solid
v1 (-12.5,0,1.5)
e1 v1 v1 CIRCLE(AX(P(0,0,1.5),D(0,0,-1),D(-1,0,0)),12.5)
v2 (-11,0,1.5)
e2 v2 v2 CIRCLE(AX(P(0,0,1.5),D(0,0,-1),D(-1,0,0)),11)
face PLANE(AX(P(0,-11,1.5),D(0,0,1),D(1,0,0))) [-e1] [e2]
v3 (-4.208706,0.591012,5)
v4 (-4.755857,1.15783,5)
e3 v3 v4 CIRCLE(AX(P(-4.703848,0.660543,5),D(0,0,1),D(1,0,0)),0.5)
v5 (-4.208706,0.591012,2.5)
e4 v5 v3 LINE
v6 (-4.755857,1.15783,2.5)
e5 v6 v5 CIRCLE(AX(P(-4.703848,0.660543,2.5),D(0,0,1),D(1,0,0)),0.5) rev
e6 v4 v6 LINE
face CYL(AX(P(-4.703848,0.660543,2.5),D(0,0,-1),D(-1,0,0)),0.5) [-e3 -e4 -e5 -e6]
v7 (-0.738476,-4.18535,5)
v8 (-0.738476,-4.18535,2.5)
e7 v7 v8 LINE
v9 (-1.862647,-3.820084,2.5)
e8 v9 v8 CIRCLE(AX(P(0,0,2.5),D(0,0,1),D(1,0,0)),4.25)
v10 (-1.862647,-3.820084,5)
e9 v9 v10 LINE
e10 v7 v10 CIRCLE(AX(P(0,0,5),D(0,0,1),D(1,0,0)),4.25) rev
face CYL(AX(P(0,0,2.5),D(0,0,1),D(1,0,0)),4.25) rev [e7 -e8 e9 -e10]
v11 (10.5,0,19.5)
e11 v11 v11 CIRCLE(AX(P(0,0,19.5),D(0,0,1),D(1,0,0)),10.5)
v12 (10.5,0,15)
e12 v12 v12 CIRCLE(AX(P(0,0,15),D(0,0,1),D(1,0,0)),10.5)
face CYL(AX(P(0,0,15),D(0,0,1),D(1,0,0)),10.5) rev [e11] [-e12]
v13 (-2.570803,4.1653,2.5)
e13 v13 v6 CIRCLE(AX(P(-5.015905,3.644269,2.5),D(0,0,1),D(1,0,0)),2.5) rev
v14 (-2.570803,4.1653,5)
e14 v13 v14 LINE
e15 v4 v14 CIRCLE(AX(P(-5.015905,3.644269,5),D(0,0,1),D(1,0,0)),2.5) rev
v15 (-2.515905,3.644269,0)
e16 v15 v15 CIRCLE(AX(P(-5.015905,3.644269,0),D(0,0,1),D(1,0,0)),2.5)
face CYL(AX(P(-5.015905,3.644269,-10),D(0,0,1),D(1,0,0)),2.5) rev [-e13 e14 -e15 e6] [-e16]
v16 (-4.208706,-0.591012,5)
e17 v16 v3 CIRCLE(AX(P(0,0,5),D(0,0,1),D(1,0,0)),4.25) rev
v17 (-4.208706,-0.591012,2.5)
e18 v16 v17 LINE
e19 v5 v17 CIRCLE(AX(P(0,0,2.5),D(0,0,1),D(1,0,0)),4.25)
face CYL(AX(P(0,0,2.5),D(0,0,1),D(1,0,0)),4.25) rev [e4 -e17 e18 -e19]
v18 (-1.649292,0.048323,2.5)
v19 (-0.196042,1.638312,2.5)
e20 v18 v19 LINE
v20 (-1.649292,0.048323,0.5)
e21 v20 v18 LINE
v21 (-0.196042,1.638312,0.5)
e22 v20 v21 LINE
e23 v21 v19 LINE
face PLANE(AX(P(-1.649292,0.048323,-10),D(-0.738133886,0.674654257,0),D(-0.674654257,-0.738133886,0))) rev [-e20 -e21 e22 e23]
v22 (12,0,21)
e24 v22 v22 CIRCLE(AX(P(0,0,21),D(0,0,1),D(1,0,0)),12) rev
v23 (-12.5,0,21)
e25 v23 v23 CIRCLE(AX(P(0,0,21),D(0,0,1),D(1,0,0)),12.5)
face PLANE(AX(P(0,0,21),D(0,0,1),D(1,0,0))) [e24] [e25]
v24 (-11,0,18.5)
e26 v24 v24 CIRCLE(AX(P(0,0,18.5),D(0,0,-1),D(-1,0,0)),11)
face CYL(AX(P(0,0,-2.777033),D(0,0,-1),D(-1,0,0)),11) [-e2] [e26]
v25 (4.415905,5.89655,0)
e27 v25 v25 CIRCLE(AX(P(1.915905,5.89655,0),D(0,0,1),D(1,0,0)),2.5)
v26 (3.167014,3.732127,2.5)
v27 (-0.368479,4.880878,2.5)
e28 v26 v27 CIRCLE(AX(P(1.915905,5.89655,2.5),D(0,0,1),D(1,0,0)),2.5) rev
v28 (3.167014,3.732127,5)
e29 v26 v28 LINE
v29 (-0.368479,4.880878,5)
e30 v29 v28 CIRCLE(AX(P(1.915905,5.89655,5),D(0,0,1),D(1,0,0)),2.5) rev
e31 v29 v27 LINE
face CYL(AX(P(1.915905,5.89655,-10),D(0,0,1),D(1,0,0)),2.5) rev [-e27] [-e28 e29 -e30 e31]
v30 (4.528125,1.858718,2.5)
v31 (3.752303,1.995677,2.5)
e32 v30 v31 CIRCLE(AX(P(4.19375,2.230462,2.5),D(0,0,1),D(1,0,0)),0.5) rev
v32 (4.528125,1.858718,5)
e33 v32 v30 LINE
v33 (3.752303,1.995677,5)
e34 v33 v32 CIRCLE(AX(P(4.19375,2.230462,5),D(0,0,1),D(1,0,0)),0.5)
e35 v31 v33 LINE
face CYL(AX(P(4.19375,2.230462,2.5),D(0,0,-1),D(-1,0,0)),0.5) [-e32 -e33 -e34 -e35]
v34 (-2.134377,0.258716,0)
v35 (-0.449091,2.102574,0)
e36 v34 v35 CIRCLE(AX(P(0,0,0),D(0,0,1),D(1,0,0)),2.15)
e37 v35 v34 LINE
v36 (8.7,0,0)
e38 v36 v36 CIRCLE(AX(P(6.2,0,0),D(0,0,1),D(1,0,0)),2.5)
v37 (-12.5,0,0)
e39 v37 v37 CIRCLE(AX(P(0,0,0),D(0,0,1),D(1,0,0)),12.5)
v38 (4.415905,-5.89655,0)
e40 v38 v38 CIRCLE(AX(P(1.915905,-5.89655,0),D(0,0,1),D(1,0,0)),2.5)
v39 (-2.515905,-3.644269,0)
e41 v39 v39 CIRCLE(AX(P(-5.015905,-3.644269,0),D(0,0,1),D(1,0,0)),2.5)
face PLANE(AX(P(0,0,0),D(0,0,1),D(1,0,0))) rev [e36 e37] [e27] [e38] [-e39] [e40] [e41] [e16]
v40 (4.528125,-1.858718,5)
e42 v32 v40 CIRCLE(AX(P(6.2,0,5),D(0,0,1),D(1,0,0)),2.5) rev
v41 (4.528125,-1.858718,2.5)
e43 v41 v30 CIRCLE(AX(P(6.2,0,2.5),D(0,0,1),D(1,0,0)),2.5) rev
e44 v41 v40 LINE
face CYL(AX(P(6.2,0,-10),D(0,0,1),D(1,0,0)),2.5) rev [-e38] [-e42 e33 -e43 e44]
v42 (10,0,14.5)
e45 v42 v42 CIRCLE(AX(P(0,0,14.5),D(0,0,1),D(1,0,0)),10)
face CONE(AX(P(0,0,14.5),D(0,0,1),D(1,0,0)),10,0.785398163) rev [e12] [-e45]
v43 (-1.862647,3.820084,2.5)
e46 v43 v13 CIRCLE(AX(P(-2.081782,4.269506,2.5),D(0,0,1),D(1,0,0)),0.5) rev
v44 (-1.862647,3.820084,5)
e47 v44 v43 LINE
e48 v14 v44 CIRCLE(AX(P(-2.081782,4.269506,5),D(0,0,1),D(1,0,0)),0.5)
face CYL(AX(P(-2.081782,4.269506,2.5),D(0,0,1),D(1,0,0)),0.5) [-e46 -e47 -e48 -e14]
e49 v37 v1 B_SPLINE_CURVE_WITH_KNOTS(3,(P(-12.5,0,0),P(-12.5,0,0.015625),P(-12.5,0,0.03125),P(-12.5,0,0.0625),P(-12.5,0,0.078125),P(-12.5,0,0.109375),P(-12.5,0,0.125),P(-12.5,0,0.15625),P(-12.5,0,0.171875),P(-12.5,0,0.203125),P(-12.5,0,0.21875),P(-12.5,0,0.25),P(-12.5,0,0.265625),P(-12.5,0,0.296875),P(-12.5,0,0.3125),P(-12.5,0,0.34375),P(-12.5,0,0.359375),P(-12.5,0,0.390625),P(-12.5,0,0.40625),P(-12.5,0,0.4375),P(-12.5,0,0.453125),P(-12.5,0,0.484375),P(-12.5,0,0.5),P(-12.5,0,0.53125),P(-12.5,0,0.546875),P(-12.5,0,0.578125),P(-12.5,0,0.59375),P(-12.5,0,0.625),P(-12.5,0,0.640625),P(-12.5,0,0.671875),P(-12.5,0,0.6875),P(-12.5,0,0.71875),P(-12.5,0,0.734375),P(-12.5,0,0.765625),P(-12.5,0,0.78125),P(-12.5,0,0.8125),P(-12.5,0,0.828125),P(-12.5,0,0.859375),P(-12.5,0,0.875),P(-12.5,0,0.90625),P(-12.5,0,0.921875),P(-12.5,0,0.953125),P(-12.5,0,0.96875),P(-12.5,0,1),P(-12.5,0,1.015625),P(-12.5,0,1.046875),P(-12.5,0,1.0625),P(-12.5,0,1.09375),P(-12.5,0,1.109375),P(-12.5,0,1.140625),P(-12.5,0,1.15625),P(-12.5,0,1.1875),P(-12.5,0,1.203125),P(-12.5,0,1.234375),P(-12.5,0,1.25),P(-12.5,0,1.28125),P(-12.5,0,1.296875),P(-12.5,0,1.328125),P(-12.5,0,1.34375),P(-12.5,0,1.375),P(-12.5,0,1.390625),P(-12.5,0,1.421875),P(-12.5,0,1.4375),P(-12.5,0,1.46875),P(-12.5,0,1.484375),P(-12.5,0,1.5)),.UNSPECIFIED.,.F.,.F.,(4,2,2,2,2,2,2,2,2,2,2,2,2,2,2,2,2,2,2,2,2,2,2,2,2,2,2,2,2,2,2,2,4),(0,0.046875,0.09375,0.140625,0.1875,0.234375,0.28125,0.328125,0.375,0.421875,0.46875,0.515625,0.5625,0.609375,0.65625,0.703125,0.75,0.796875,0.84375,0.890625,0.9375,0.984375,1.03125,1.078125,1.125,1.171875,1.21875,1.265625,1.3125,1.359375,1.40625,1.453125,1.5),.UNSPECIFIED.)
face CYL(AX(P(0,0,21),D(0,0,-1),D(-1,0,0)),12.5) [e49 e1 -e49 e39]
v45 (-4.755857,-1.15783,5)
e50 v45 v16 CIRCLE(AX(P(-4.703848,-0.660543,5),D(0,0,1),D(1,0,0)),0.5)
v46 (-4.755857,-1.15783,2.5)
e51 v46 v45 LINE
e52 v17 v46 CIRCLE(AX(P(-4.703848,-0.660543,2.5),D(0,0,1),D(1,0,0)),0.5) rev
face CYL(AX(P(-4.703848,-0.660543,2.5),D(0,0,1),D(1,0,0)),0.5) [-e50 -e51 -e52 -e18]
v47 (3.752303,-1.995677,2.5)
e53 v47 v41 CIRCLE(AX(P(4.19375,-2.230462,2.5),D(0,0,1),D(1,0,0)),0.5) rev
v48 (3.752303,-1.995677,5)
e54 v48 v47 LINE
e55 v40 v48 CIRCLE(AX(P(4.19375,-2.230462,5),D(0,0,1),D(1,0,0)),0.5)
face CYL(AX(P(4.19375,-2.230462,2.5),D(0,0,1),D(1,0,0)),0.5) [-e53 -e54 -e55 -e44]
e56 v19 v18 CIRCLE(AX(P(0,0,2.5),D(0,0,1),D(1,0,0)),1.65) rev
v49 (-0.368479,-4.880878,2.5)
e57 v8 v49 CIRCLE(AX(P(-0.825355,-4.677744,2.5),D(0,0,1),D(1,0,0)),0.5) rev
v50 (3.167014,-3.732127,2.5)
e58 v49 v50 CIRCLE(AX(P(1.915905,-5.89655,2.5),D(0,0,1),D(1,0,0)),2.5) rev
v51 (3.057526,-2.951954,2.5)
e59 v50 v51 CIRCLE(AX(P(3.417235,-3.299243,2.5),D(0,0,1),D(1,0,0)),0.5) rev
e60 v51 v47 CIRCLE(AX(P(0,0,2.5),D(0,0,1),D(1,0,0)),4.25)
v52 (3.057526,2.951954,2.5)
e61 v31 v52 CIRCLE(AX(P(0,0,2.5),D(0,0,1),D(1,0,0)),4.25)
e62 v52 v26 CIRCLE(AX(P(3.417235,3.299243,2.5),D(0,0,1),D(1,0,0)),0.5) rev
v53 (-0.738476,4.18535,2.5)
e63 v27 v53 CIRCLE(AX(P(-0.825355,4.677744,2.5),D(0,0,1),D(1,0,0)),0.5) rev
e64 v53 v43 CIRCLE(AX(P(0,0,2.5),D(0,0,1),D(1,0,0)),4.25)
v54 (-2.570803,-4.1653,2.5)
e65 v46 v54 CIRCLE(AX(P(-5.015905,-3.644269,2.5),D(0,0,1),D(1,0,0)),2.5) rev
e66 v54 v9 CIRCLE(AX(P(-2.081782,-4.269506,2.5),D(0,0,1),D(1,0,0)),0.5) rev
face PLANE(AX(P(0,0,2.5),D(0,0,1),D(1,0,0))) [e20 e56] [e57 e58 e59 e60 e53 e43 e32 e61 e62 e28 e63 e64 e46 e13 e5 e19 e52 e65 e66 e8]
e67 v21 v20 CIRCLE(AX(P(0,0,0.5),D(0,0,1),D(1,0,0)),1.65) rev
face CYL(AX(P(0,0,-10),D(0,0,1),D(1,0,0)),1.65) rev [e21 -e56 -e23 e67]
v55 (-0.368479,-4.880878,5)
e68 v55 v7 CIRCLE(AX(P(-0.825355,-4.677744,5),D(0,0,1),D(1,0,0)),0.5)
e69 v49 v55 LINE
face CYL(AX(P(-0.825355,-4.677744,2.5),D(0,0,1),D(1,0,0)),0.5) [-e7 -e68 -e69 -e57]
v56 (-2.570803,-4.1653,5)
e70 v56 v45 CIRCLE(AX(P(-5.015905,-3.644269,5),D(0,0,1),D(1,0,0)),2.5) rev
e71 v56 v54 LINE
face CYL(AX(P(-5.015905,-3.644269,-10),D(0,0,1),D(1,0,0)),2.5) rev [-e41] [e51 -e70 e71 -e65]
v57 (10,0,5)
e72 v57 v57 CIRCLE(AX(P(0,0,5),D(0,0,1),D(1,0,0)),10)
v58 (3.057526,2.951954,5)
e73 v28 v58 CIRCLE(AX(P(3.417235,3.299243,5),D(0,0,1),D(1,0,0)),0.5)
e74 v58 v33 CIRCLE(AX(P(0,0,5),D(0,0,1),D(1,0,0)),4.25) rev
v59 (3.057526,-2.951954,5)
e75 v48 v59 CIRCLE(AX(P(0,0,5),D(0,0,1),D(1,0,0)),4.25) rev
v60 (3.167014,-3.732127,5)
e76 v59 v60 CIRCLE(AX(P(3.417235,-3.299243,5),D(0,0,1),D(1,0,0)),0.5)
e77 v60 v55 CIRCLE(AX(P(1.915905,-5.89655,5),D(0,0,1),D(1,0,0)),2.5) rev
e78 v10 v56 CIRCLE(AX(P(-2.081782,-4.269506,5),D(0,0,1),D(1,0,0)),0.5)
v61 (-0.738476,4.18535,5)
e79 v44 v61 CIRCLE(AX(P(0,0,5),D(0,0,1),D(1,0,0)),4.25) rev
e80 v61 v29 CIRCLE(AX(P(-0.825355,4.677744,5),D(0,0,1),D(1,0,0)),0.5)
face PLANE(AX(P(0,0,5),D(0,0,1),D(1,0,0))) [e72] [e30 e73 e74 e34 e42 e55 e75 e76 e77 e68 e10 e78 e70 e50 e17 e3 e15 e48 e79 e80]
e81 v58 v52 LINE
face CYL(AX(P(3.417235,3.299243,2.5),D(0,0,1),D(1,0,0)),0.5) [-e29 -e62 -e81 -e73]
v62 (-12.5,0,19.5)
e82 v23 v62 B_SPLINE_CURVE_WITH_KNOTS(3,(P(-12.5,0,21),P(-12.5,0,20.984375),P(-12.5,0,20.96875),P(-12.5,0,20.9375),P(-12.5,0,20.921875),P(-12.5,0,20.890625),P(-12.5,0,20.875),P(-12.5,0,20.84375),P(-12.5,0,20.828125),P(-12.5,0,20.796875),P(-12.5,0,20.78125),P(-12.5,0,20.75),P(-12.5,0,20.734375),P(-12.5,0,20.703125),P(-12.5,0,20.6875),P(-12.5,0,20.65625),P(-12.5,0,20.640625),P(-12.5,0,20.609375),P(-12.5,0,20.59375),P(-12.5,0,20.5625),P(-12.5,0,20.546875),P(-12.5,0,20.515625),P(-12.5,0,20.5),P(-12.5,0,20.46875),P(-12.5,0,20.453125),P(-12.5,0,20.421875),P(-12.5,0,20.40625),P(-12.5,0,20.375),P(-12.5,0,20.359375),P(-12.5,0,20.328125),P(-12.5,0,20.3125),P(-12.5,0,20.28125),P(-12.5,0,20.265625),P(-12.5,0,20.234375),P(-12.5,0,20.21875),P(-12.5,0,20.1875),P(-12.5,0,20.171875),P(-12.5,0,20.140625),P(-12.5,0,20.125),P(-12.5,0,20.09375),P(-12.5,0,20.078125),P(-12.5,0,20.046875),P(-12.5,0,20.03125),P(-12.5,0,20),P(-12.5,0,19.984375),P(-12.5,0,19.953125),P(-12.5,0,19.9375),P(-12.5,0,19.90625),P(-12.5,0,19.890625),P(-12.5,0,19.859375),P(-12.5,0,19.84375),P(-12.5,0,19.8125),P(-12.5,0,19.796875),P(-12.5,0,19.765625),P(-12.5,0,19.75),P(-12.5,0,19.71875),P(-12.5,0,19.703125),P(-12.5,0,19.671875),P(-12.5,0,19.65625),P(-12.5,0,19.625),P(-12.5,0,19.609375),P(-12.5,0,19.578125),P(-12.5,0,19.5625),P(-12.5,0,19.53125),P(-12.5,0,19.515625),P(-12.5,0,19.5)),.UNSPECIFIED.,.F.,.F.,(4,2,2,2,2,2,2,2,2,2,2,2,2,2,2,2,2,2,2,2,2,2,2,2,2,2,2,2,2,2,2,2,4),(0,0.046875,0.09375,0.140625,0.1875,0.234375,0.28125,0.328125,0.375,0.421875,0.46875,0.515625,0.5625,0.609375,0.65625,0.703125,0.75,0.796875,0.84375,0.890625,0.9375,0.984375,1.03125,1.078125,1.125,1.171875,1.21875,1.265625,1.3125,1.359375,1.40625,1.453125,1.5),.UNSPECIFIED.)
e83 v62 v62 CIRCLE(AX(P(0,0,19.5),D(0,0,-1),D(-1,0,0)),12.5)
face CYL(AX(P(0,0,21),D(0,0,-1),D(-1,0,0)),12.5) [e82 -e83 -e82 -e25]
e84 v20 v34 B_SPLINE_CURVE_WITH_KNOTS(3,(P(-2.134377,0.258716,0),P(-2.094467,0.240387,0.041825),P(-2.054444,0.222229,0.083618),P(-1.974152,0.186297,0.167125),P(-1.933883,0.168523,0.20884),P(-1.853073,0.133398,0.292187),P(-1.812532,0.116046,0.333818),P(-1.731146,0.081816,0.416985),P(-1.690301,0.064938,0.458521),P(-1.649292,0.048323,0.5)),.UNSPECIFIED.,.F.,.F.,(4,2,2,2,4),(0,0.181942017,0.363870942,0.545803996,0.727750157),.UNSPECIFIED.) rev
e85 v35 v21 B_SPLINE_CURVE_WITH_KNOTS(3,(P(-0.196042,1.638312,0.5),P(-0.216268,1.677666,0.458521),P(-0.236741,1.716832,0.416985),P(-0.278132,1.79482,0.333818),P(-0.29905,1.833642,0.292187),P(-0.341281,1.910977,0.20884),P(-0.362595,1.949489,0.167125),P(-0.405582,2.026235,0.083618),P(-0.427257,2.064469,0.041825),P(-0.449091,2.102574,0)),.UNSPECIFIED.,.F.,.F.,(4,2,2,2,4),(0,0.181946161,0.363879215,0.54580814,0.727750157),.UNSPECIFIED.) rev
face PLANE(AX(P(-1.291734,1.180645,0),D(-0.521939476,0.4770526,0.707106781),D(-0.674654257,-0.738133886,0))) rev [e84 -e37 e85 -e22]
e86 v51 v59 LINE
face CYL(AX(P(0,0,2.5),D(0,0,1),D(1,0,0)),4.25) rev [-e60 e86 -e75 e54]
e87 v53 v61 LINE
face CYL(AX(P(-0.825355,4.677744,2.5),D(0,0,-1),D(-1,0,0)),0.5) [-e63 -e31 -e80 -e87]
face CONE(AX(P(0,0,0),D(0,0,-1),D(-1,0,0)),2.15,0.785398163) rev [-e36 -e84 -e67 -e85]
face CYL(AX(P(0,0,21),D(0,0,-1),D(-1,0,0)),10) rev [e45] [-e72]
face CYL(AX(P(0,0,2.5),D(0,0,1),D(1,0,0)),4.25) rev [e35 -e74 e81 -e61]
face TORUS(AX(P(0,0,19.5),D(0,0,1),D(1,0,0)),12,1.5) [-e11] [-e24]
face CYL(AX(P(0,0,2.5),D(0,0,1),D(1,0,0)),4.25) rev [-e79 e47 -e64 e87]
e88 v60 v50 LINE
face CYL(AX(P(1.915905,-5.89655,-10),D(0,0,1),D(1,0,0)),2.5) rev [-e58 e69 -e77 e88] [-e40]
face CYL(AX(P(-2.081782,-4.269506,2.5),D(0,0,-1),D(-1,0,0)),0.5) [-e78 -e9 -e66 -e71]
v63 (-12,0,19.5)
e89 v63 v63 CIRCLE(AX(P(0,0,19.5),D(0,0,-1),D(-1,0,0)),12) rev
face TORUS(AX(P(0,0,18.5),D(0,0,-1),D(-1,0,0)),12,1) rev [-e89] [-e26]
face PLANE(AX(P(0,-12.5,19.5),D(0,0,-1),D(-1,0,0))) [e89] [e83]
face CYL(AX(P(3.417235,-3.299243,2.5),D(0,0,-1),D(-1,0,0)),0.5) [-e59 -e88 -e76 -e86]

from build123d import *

# Parameters (mm, degrees)
ESBO_O1_R                = 12.5
RESSALTO_EXTRUS_O1_DEPTH = 21
ESBO_O4_W                = 18
ESBO_O4_H                = 1.4999999999999982
ESBO_O5_R                = 9.25
CORTE_EXTRUS_O1_DEPTH    = 14
CORTE_EXTRUS_O2_DEPTH    = 17
ESBO_O7_R                = 2.499999999999999
ESBO_O7_R_2              = 2.5000000000000018
ESBO_O7_R_3              = 2.5
ESBO_O7_R_4              = 2.500000000000001
ESBO_O7_R_5              = 2.5000000000000004
CORTE_EXTRUS_O3_DEPTH    = 17
ESBO_O11_R               = 10
CORTE_EXTRUS_O4_DEPTH    = 23.54994456755936
CHANFRO3_SIZE            = 0.5
FILETE2_R                = 1
ESBO_O12_R               = 4.25
CORTE_EXTRUS_O5_DEPTH    = 4.5
CORTE_EXTRUS_O6_START    = -2
ESBO_O13_R               = 9.999999999998892
CORTE_EXTRUS_O6_DEPTH    = 2
ESBO_O14_R               = 10.5
CORTE_EXTRUS_O7_DEPTH    = 6
CHANFRO5_SIZE            = 0.5
FILETE3_R                = 1.5
FILETE4_R                = 0.5


# Some blends are built 0.0001 mm under size
with BuildPart() as part:
    # Esboço1 → Ressalto-extrusão1 (new body)
    with BuildSketch(Plane.XY):
        with Locations(Location((0, 0, 0), (0, 0, 180))):
            Circle(ESBO_O1_R)
    extrude(amount=RESSALTO_EXTRUS_O1_DEPTH)

    # Esboço4 → Corte-Revolução1 (revolve, cut)
    with BuildSketch(Plane(origin=(0, 0, 0), x_dir=(0, 0, -1), z_dir=(1, 0, 0)), mode=Mode.PRIVATE) as corte_revolu_o1_sk:
        with Locations((-10.5, -11.750000000000004)):
            Rectangle(ESBO_O4_W, ESBO_O4_H)
    revolve(corte_revolu_o1_sk.sketch.rotate(Axis((0, 0, -2.777032731116021), (0, 0, 1)), 270), axis=Axis((0, 0, -2.777032731116021), (0, 0, 1)), mode=Mode.SUBTRACT)

    # Esboço5 → Corte-extrusão1 (cut)
    with BuildSketch(Plane.XY.offset(21)):
        Circle(ESBO_O5_R)
    extrude(amount=-CORTE_EXTRUS_O1_DEPTH, mode=Mode.SUBTRACT)

    # Esboço6 → Corte-extrusão2 (cut)
    with BuildSketch(Plane.XY.offset(7.000000000000001)):
        with BuildLine():
            Line((-1.6492922297361152, 0.04832329595623431), (-0.1960424852505637, 1.6383123462810085))
            ThreePointArc((-0.1960424852505637, 1.6383123462810085), (1.2179209118912084, -1.1131795238765794), (-1.6492922297361152, 0.04832329595623431))
        make_face()
    extrude(amount=-CORTE_EXTRUS_O2_DEPTH, mode=Mode.SUBTRACT)

    # Esboço7 → Corte-extrusão3 (cut)
    with BuildSketch(Plane.XY.offset(7.000000000000001)):
        with Locations((6.2, 0)):
            Circle(ESBO_O7_R)
        with Locations((1.9159053651246736, -5.896550401029952)):
            Circle(ESBO_O7_R_2)
        with Locations((-5.015905365124674, -3.644268564213333)):
            Circle(ESBO_O7_R_3)
        with Locations((-5.0159053651246746, 3.644268564213335)):
            Circle(ESBO_O7_R_4)
        with Locations((1.9159053651246742, 5.8965504010299545)):
            Circle(ESBO_O7_R_5)
    extrude(amount=-CORTE_EXTRUS_O3_DEPTH, mode=Mode.SUBTRACT)

    # Esboço11 → Corte-extrusão4 (cut, through all)
    with BuildSketch(Plane.XY.offset(7.000000000000001)):
        Circle(ESBO_O11_R)
    extrude(amount=CORTE_EXTRUS_O4_DEPTH, mode=Mode.SUBTRACT)

    # Chanfro3
    chanfro3_edges = [part.edges().sort_by_distance(p)[0] for p in [
        (-0.9226673574933396, 0.8433178211186214, 0),
        (1.2179209118912089, -1.1131795238765791, 0),
    ]]
    chamfer(chanfro3_edges, length=CHANFRO3_SIZE)

    # Filete2
    filete2_edges = [part.edges().sort_by_distance(p)[0] for p in [
        (11.000000000000004, -3.79e-15, 19.5),
    ]]
    fillet(filete2_edges, radius=FILETE2_R)

    # Esboço12 → Corte-extrusão5 (cut)
    with BuildSketch(Plane.XY.offset(7.000000000000001)):
        Circle(ESBO_O12_R)
    extrude(amount=-CORTE_EXTRUS_O5_DEPTH, mode=Mode.SUBTRACT)

    # Esboço13 → Corte-extrusão6 (cut)
    with BuildSketch(Plane.XY.offset(7.000000000000001).offset(CORTE_EXTRUS_O6_START)):
        Circle(ESBO_O13_R)
    extrude(amount=CORTE_EXTRUS_O6_DEPTH, mode=Mode.SUBTRACT)

    # Esboço14 → Corte-extrusão7 (cut)
    with BuildSketch(Plane.XY.offset(21)):
        Circle(ESBO_O14_R)
    extrude(amount=-CORTE_EXTRUS_O7_DEPTH, mode=Mode.SUBTRACT)

    # Chanfro5
    chanfro5_edges = [part.edges().sort_by_distance(p)[0] for p in [
        (-10, -3.6e-16, 15),
    ]]
    chamfer(chanfro5_edges, length=CHANFRO5_SIZE - 0.0001)  # a hair under: the kernel refuses the full size

    # Filete3
    filete3_edges = [part.edges().sort_by_distance(p)[0] for p in [
        (-10.49999999999999, -2.18e-15, 21),
    ]]
    fillet(filete3_edges, radius=FILETE3_R)

    # Filete4
    # the kernel refuses this fillet: 0.5 mm, written as the material it takes off along each edge
    with BuildSketch(Plane(origin=(0.0348414521611502, 4.24985718268406, 2.500000000000001), x_dir=(-0.5385482675790525, 0.8425946614402451, 0), z_dir=(0, 0, 1))) as filete4_piece_1:
        with BuildLine():
            CenterArc((0.823792647207476, 0.4943596381730637), FILETE4_R, 157.42158231985286, 103.96421233199169)
            ThreePointArc((0.3621151927317683, 0.6863334072896572), (0.19675498821110124, 0.3348846296367101), (0, 0))
            ThreePointArc((0, 0), (0.3744512032761266, 0.02820180913468155), (0.7489024065522512, 3e-17))
        make_face()
    extrude(amount=4.440007987691346, mode=Mode.SUBTRACT)
    with BuildSketch(Plane(origin=(-4.031087766088941, 1.346414283230858, 2.500000000000001), x_dir=(-0.9677757103313676, -0.2518137694658835, 0), z_dir=(0, 0, 1))) as filete4_piece_2:
        with BuildLine():
            CenterArc((0.8237926472074756, 0.4943596381730638), FILETE4_R, 157.42158231985286, 103.96421233199163)
            ThreePointArc((0.36211519273176773, 0.6863334072896573), (0.19675498821110218, 0.3348846296367097), (0, 0))
            ThreePointArc((0, 0), (0.3744512032761257, 0.02820180913468181), (0.7489024065522503, 3e-17))
        make_face()
    extrude(amount=4.440007987691345, mode=Mode.SUBTRACT)
    with BuildSketch(Plane(origin=(-2.5261907032380004, -3.417727392709064, 2.500000000000001), x_dir=(-0.059570014892305595, -0.9982241298053911, 0), z_dir=(0, 0, 1))) as filete4_piece_3:
        with BuildLine():
            CenterArc((0.8237926472074754, 0.4943596381730636), FILETE4_R, 157.42158231985266, 103.9642123319918)
            ThreePointArc((0.3621151927317685, 0.6863334072896586), (0.19675498821109988, 0.33488462963670823), (0, 0))
            ThreePointArc((0, 0), (0.37445120327612497, 0.02820180913468126), (0.7489024065522498, 0))
        make_face()
    extrude(amount=4.44000798769135, mode=Mode.SUBTRACT)
    with BuildSketch(Plane(origin=(4.052620967741936, 1.2801419030007621, 2.500000000000001), x_dir=(0.6349345763851404, 0.7725659089751646, 0), z_dir=(0, 0, 1))) as filete4_piece_4:
        with BuildLine():
            CenterArc((0.8237926472074759, 0.4943596381730635), FILETE4_R, 157.42158231985277, 103.96421233199169)
            ThreePointArc((0.36211519273176856, 0.6863334072896574), (0.19675498821110185, 0.33488462963671034), (0, 0))
            ThreePointArc((0, 0), (0.37445120327612536, 0.0282018091346815), (0.7489024065522507, 1e-17))
        make_face()
    extrude(amount=4.440007987691347, mode=Mode.SUBTRACT)
    with BuildSketch(Plane(origin=(2.4698160494238595, -3.458685976206616, 2.500000000000001), x_dir=(0.9309594164175853, -0.36512267114413594, 0), z_dir=(0, 0, 1))) as filete4_piece_5:
        with BuildLine():
            CenterArc((0.8237926472074742, 0.49435963817306355), FILETE4_R, 157.4215823198528, 103.96421233199175)
            ThreePointArc((0.36211519273176695, 0.6863334072896573), (0.19675498821110182, 0.3348846296367097), (0, 0))
            ThreePointArc((0, 0), (0.374451203276125, 0.0282018091346814), (0.7489024065522494, 4e-17))
        make_face()
    extrude(amount=4.440007987691345, mode=Mode.SUBTRACT)
    with BuildSketch(Plane(origin=(2.469816049423857, 3.4586859762066187, 2.500000000000001), x_dir=(0.7573556902798542, -0.6530025715115719, 0), z_dir=(0, 0, 1))) as filete4_piece_6:
        with BuildLine():
            CenterArc((0.8216504418457475, 0.4979119689888876), FILETE4_R, 160.79770494401825, 103.96421233199163)
            ThreePointArc((0.34946884369362086, 0.662364206330018), (0.1996774167699546, 0.3180219723627336), (0, 0))
            ThreePointArc((0, 0), (0.38800159753826985, 0.01774826359445502), (0.776003195076539, -3e-17))
        make_face()
    extrude(amount=4.440007987691348, mode=Mode.SUBTRACT)
    with BuildSketch(Plane(origin=(4.052620967741936, -1.2801419030007621, 2.500000000000001), x_dir=(-0.3870065717105284, -0.9220769563614871, 0), z_dir=(0, 0, 1))) as filete4_piece_7:
        with BuildLine():
            CenterArc((0.8216504418457483, 0.4979119689888879), FILETE4_R, 160.7977049440181, 103.96421233199175)
            ThreePointArc((0.3494688436936216, 0.6623642063300196), (0.19967741676995576, 0.3180219723627358), (0, 0))
            ThreePointArc((0, 0), (0.38800159753827046, 0.01774826359445508), (0.7760031950765397, 0))
        make_face()
    extrude(amount=4.440007987691349, mode=Mode.SUBTRACT)
    with BuildSketch(Plane(origin=(0.0348414521611462, -4.24985718268406, 2.500000000000001), x_dir=(-0.9965389054665341, 0.08312767223712024, 0), z_dir=(0, 0, 1))) as filete4_piece_8:
        with BuildLine():
            CenterArc((0.8216504418457475, 0.4979119689888879), FILETE4_R, 160.79770494401836, 103.96421233199152)
            ThreePointArc((0.3494688436936206, 0.6623642063300171), (0.19967741676995457, 0.31802197236273494), (0, 0))
            ThreePointArc((0, 0), (0.3880015975382697, 0.01774826359445501), (0.776003195076539, -1e-17))
        make_face()
    extrude(amount=4.440007987691348, mode=Mode.SUBTRACT)
    with BuildSketch(Plane(origin=(-4.031087766088943, -1.3464142832308554, 2.500000000000001), x_dir=(-0.9677757103313678, 0.2518137694658824, 0), z_dir=(0, 0, 1))) as filete4_piece_9:
        with BuildLine():
            CenterArc((0.8237926472074728, -0.49435963817306383), FILETE4_R, 98.61420534815544, 103.9642123319918)
            ThreePointArc((0.36211519273176607, -0.686333407289658), (0.19675498821110143, -0.334884629636712), (0, 0))
            ThreePointArc((0, 0), (0.37445120327612447, -0.02820180913468116), (0.7489024065522482, -3e-17))
        make_face()
    extrude(amount=4.440007987691345, mode=Mode.SUBTRACT)
    with BuildSketch(Plane(origin=(-2.5261907032380004, 3.4177273927090632, 2.500000000000001), x_dir=(0.8550781298766168, 0.5184991724262514, 0), z_dir=(0, 0, 1))) as filete4_piece_10:
        with BuildLine():
            CenterArc((0.8216504418457481, 0.49791196898888734), FILETE4_R, 160.79770494401822, 103.96421233199158)
            ThreePointArc((0.3494688436936213, 0.6623642063300179), (0.19967741676995546, 0.31802197236273533), (0, 0))
            ThreePointArc((0, 0), (0.3880015975382698, 0.01774826359445526), (0.7760031950765391, -4e-17))
        make_face()
    extrude(amount=4.440007987691348, mode=Mode.SUBTRACT)


solid = part.part
